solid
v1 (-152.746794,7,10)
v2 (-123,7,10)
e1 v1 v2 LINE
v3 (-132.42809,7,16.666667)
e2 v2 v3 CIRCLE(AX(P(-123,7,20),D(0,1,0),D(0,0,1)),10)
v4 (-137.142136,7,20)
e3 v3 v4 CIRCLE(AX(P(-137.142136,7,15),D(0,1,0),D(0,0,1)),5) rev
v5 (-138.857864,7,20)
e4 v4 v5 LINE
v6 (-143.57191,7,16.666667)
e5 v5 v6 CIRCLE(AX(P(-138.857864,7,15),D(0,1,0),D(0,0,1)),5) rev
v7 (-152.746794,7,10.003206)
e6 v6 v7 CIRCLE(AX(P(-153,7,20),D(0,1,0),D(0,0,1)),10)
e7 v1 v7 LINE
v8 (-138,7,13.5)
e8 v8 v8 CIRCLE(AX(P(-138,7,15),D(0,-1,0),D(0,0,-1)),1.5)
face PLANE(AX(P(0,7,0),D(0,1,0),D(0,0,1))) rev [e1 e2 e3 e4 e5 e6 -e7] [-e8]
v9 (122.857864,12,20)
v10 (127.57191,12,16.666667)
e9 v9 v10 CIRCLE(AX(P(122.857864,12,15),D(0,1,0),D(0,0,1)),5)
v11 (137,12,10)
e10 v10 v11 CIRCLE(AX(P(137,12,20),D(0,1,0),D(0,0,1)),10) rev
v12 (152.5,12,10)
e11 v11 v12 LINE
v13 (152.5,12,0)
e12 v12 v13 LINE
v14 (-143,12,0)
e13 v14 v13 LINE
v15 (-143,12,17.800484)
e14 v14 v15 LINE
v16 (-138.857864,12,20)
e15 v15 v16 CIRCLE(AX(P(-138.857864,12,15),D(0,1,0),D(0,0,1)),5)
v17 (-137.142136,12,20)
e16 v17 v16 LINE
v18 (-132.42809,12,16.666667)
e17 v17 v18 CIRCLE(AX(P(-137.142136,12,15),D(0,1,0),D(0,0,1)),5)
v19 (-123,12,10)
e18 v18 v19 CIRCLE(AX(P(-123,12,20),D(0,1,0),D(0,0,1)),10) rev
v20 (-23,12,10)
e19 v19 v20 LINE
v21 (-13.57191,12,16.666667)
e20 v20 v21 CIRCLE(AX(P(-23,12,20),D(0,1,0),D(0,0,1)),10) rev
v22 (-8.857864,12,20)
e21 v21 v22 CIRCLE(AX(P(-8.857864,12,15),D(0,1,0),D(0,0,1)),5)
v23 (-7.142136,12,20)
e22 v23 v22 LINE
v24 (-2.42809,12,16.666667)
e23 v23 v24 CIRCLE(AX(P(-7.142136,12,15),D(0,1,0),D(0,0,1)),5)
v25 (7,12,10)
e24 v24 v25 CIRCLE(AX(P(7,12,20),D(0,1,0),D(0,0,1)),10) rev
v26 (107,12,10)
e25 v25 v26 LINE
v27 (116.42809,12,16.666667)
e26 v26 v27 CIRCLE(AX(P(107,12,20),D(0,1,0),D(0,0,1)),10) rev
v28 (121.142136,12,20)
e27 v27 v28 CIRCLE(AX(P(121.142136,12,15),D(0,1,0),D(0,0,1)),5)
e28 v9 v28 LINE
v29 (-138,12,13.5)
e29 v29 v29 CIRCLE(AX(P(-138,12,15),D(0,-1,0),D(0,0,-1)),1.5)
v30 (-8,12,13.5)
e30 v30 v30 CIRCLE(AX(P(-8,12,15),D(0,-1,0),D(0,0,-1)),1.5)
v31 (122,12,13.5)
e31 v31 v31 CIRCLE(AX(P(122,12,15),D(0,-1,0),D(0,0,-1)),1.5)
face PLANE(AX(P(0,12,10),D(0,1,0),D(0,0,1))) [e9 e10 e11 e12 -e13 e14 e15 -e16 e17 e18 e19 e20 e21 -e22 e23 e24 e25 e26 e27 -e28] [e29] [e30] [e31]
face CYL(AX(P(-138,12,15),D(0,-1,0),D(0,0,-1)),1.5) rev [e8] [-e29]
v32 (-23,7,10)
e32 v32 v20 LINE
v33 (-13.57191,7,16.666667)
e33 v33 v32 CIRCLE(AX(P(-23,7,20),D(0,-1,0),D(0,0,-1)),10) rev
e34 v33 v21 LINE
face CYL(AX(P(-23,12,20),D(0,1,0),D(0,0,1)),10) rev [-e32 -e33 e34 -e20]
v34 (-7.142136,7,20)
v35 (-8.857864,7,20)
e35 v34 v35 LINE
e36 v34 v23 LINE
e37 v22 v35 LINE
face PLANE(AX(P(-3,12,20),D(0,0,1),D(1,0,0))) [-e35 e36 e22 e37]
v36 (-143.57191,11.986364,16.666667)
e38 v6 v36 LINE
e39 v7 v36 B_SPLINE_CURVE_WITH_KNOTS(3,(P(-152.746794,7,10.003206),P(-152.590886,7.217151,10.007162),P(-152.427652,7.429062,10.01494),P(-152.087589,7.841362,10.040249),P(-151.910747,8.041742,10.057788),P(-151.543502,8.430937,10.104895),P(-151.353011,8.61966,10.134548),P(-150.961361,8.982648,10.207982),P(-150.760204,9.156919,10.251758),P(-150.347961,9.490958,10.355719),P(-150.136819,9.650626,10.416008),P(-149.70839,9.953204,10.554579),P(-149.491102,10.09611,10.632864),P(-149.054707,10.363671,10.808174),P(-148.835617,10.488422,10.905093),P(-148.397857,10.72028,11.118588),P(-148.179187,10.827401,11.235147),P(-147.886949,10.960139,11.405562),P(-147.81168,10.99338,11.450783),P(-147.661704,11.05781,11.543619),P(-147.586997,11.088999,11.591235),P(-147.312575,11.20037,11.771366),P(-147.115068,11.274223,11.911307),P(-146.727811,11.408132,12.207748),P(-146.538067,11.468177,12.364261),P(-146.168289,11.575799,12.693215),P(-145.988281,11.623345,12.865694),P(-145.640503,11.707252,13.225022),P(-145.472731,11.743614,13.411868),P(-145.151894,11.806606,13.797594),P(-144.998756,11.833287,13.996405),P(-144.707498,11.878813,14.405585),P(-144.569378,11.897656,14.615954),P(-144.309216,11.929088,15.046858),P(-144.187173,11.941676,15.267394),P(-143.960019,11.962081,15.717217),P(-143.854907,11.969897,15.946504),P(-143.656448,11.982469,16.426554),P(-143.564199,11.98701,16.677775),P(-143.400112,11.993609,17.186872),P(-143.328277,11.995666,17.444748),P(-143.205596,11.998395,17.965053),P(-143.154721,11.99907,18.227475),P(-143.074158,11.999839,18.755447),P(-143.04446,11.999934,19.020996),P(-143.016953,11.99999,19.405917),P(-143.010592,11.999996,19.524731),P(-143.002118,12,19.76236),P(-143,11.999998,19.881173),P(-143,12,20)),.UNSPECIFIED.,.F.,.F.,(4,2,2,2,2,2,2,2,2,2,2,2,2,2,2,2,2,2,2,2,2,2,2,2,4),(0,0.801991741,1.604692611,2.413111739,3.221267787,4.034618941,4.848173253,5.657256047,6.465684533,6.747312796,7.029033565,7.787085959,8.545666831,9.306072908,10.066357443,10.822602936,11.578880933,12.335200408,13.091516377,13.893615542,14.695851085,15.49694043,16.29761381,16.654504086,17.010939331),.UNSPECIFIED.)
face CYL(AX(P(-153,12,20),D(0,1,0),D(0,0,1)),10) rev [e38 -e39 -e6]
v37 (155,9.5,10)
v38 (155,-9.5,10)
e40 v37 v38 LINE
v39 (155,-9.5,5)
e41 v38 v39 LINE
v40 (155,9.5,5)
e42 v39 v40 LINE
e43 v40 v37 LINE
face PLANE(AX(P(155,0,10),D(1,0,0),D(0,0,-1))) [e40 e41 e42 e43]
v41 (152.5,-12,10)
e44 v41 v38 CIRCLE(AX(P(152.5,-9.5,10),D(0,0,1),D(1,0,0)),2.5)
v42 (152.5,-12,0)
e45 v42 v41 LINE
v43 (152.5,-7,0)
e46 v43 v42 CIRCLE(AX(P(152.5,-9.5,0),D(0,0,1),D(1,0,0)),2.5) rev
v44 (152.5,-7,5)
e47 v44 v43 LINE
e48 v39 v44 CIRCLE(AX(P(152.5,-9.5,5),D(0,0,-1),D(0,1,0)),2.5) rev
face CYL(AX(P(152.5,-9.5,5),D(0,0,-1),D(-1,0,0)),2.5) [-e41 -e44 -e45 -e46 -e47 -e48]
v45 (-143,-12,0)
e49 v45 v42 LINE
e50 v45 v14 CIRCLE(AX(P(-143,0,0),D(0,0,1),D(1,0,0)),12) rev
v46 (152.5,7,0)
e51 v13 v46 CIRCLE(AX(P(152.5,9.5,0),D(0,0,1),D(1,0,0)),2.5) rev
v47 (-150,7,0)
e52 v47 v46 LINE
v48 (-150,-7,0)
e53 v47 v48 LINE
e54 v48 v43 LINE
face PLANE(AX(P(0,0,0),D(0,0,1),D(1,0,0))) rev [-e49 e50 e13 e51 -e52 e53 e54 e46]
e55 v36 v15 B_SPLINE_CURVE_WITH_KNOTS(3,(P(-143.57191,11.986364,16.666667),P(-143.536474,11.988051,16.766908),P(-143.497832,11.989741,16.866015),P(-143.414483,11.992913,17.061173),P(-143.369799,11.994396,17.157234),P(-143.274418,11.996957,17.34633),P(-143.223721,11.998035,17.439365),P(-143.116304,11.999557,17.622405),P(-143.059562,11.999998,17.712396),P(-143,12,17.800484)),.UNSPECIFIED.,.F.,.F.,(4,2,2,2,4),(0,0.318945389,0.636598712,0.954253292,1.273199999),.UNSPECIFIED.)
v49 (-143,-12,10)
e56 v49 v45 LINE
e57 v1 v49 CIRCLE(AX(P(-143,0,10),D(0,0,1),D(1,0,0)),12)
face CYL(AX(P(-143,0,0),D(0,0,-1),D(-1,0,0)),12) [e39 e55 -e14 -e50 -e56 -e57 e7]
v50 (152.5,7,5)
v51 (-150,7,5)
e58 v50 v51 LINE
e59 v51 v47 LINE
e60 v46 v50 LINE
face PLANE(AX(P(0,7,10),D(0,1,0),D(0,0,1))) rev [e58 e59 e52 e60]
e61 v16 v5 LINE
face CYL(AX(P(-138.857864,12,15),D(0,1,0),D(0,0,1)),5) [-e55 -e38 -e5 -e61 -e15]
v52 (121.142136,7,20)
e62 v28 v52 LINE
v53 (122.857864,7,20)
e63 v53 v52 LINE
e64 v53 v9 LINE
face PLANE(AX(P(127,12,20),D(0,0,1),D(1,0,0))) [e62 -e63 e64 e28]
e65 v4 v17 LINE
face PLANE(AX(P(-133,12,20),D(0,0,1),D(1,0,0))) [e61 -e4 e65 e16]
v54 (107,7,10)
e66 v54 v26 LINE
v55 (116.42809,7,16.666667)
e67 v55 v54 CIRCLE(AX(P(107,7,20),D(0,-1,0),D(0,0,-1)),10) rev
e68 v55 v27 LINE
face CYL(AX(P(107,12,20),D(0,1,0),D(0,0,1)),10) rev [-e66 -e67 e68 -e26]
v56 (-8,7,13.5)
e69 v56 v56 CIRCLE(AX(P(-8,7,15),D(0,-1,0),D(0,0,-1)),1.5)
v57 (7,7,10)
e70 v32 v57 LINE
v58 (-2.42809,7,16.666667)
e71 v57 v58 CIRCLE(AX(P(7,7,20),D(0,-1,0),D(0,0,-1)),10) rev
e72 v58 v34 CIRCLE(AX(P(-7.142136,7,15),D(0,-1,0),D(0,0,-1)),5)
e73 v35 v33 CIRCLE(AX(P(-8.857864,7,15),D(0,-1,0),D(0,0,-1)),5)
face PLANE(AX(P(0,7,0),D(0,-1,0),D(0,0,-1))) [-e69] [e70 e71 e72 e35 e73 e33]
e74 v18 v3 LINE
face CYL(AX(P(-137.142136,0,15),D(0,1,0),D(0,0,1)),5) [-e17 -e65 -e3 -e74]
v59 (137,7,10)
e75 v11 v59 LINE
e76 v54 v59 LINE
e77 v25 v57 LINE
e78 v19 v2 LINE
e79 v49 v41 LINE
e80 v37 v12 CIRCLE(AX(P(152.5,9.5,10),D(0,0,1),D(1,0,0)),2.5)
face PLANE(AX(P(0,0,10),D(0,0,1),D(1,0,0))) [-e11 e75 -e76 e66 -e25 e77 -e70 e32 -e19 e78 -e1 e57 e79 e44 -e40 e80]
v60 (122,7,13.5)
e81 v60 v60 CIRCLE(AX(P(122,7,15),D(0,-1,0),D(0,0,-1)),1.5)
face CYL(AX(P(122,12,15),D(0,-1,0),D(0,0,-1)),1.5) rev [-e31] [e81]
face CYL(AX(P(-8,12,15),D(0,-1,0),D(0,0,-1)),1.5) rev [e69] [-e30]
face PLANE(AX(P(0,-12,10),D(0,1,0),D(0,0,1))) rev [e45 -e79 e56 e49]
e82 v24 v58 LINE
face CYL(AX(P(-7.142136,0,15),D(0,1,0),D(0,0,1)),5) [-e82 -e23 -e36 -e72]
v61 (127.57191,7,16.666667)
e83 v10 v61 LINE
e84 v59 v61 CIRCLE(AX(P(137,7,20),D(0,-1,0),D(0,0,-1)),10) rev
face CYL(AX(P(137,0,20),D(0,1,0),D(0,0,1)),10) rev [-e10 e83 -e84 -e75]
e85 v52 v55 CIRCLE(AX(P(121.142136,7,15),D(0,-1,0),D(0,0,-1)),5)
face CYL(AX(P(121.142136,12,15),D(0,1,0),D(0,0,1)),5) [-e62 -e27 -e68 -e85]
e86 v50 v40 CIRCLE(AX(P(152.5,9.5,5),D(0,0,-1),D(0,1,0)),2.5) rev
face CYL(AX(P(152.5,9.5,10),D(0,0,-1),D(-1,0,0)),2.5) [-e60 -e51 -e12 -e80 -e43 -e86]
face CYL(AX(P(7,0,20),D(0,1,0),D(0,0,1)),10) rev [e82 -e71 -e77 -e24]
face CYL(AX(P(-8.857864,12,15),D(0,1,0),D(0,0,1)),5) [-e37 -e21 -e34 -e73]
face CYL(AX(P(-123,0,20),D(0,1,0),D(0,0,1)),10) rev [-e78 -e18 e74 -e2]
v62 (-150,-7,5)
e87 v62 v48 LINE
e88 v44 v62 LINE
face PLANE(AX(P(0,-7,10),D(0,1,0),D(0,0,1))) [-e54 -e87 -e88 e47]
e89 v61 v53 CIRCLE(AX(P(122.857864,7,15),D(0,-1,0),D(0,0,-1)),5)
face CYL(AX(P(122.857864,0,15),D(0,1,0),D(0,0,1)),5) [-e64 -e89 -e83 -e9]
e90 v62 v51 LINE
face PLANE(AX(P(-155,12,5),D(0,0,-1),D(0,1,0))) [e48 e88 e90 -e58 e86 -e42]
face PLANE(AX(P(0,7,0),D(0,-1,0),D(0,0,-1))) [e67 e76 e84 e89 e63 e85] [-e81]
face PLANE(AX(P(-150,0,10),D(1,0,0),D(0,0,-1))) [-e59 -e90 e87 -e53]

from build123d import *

# Parameters (mm, degrees)
BOSS_EXTRU_1_DEPTH = 10
BOSS_EXTRU_2_REACH = 312.393
ESQUISSE2_W        = 5
ESQUISSE2_H        = 24
CONG_1_RADIUS      = 12
CONG_1_LENGTH      = 10
BOSS_EXTRU_3_START = -19
ESQUISSE3_W        = 10
ESQUISSE3_H        = 10
ESQUISSE3_R        = 1.5
BOSS_EXTRU_3_DEPTH = 5
CONG_2_R           = 10
CONG_3_R           = 10
CONG_4_R           = 2.5
CONG_5_R           = 2.5
CONG_6_R           = 5


# Some blends are built 0.0001 mm under size
with BuildPart() as part:
    # Esquisse1 → Boss.-Extru.1 (new body)
    with BuildSketch(Plane.XY):
        Polygon((-150, 7), (-155, 7), (-155, -12), (155, -12), (155, -7), (150, -7), (-150, -7), align=None)
        Polygon((155, 12), (-155, 12), (-155, 7), (-150, 7), (150, 7), (155, 7), align=None)
    extrude(amount=BOSS_EXTRU_1_DEPTH)

    # Esquisse2 → Boss.-Extru.2 (add, up to next)
    with BuildSketch(Plane(origin=(155, 0, 0), x_dir=(0, 0, -1), z_dir=(1, 0, 0)), mode=Mode.PRIVATE) as boss_extru_2_sk1:
        with Locations((-7.5, 0)):
            Rectangle(ESQUISSE2_W, ESQUISSE2_H)
    boss_extru_2_tool1 = extrude(boss_extru_2_sk1.sketch, amount=-BOSS_EXTRU_2_REACH, mode=Mode.PRIVATE) - part.part
    add(boss_extru_2_tool1.solids().sort_by_distance((155, 0, 7.5))[0])

    # Congé1: full round fillet: the end face becomes a half cylinder, R = half its width
    cong_1_face = Plane((-155, 0, 5), x_dir=(0, 0, 1), z_dir=(-1, 0, 0))  # on the end face: x along it, z out of the body
    cong_1_slab = cong_1_face.offset(-CONG_1_RADIUS / 2) * Box(CONG_1_LENGTH, 2 * CONG_1_RADIUS, CONG_1_RADIUS, mode=Mode.PRIVATE)  # the body's end, R deep
    cong_1_round = Plane((-143, 0, 5), x_dir=(-1, 0, 0), z_dir=(0, 0, 1)) * Cylinder(CONG_1_RADIUS, CONG_1_LENGTH, mode=Mode.PRIVATE)  # its axis R under the face
    add(cong_1_slab - cong_1_round, mode=Mode.SUBTRACT)

    # Esquisse3 → Boss.-Extru.3 (add)
    # profile 1 of 3: a face of its own
    with BuildSketch(Plane.XZ.offset(12).offset(BOSS_EXTRU_3_START)):
        with Locations((-8, 15)):
            Rectangle(ESQUISSE3_W, ESQUISSE3_H)
        with Locations(Location((-8, 15, 0), (0, 0, 270))):
            Circle(ESQUISSE3_R, mode=Mode.SUBTRACT)
    # profile 2 of 3: a face of its own
    with BuildSketch(Plane.XZ.offset(12).offset(BOSS_EXTRU_3_START)):
        with Locations((-138, 15)):
            Rectangle(ESQUISSE3_W, ESQUISSE3_H)
        with Locations(Location((-138, 15, 0), (0, 0, 270))):
            Circle(ESQUISSE3_R, mode=Mode.SUBTRACT)
    # profile 3 of 3: a face of its own
    with BuildSketch(Plane.XZ.offset(12).offset(BOSS_EXTRU_3_START)):
        with Locations((122, 15)):
            Rectangle(ESQUISSE3_W, ESQUISSE3_H)
        with Locations(Location((122, 15, 0), (0, 0, 270))):
            Circle(ESQUISSE3_R, mode=Mode.SUBTRACT)
    extrude(amount=-BOSS_EXTRU_3_DEPTH)

    # Congé2
    # the kernel refuses this fillet: 10 mm, written as the material it adds along each edge
    with BuildSketch(Plane(origin=(-143, 7, 10), x_dir=(-1, 0, 0), z_dir=(0, 1, 0))) as cong_2_piece_1_section:
        with BuildLine():
            CenterArc((CONG_2_R, CONG_2_R), CONG_2_R, 180, 90)
            Line((0, CONG_2_R), (0, 0))
            Line((0, 0), (CONG_2_R, 0))
        make_face()
    cong_2_piece_1 = extrude(amount=30, mode=Mode.PRIVATE)
    cong_2_piece_1 = cong_2_piece_1 & Plane(origin=(-143, 0, 12.346007959), x_dir=(-1, 0, 0), z_dir=(0, 0, 1)) * Cylinder(12, 100, mode=Mode.PRIVATE)
    add(cong_2_piece_1)

    # Congé3
    cong_3_edges = [part.edges().sort_by_distance(p)[0] for p in [
        (127, 9.5, 10),
        (117, 9.5, 10),
        (-3, 9.5, 10),
        (-13, 9.5, 10),
        (-133, 9.5, 10),
    ]]
    fillet(cong_3_edges, radius=CONG_3_R - 0.0001)  # a hair under: the kernel refuses the full size

    # Congé4
    cong_4_edges = [part.edges().sort_by_distance(p)[0] for p in [
        (155, -12, 5),
        (155, -7, 2.5),
    ]]
    fillet(cong_4_edges, radius=CONG_4_R - 0.0001)  # a hair under: the kernel refuses the full size

    # Congé5
    cong_5_edges = [part.edges().sort_by_distance(p)[0] for p in [
        (155, 12, 5),
        (155, 7, 2.5),
    ]]
    fillet(cong_5_edges, radius=CONG_5_R - 0.0001)  # a hair under: the kernel refuses the full size

    # Congé6
    cong_6_edges = [part.edges().sort_by_distance(p)[0] for p in [
        (-143, 9.5, 20),
        (-133, 9.5, 20),
        (-13, 9.5, 20),
        (-3, 9.5, 20),
        (117, 9.5, 20),
        (127, 9.5, 20),
    ]]
    fillet(cong_6_edges, radius=CONG_6_R)


solid = part.part
